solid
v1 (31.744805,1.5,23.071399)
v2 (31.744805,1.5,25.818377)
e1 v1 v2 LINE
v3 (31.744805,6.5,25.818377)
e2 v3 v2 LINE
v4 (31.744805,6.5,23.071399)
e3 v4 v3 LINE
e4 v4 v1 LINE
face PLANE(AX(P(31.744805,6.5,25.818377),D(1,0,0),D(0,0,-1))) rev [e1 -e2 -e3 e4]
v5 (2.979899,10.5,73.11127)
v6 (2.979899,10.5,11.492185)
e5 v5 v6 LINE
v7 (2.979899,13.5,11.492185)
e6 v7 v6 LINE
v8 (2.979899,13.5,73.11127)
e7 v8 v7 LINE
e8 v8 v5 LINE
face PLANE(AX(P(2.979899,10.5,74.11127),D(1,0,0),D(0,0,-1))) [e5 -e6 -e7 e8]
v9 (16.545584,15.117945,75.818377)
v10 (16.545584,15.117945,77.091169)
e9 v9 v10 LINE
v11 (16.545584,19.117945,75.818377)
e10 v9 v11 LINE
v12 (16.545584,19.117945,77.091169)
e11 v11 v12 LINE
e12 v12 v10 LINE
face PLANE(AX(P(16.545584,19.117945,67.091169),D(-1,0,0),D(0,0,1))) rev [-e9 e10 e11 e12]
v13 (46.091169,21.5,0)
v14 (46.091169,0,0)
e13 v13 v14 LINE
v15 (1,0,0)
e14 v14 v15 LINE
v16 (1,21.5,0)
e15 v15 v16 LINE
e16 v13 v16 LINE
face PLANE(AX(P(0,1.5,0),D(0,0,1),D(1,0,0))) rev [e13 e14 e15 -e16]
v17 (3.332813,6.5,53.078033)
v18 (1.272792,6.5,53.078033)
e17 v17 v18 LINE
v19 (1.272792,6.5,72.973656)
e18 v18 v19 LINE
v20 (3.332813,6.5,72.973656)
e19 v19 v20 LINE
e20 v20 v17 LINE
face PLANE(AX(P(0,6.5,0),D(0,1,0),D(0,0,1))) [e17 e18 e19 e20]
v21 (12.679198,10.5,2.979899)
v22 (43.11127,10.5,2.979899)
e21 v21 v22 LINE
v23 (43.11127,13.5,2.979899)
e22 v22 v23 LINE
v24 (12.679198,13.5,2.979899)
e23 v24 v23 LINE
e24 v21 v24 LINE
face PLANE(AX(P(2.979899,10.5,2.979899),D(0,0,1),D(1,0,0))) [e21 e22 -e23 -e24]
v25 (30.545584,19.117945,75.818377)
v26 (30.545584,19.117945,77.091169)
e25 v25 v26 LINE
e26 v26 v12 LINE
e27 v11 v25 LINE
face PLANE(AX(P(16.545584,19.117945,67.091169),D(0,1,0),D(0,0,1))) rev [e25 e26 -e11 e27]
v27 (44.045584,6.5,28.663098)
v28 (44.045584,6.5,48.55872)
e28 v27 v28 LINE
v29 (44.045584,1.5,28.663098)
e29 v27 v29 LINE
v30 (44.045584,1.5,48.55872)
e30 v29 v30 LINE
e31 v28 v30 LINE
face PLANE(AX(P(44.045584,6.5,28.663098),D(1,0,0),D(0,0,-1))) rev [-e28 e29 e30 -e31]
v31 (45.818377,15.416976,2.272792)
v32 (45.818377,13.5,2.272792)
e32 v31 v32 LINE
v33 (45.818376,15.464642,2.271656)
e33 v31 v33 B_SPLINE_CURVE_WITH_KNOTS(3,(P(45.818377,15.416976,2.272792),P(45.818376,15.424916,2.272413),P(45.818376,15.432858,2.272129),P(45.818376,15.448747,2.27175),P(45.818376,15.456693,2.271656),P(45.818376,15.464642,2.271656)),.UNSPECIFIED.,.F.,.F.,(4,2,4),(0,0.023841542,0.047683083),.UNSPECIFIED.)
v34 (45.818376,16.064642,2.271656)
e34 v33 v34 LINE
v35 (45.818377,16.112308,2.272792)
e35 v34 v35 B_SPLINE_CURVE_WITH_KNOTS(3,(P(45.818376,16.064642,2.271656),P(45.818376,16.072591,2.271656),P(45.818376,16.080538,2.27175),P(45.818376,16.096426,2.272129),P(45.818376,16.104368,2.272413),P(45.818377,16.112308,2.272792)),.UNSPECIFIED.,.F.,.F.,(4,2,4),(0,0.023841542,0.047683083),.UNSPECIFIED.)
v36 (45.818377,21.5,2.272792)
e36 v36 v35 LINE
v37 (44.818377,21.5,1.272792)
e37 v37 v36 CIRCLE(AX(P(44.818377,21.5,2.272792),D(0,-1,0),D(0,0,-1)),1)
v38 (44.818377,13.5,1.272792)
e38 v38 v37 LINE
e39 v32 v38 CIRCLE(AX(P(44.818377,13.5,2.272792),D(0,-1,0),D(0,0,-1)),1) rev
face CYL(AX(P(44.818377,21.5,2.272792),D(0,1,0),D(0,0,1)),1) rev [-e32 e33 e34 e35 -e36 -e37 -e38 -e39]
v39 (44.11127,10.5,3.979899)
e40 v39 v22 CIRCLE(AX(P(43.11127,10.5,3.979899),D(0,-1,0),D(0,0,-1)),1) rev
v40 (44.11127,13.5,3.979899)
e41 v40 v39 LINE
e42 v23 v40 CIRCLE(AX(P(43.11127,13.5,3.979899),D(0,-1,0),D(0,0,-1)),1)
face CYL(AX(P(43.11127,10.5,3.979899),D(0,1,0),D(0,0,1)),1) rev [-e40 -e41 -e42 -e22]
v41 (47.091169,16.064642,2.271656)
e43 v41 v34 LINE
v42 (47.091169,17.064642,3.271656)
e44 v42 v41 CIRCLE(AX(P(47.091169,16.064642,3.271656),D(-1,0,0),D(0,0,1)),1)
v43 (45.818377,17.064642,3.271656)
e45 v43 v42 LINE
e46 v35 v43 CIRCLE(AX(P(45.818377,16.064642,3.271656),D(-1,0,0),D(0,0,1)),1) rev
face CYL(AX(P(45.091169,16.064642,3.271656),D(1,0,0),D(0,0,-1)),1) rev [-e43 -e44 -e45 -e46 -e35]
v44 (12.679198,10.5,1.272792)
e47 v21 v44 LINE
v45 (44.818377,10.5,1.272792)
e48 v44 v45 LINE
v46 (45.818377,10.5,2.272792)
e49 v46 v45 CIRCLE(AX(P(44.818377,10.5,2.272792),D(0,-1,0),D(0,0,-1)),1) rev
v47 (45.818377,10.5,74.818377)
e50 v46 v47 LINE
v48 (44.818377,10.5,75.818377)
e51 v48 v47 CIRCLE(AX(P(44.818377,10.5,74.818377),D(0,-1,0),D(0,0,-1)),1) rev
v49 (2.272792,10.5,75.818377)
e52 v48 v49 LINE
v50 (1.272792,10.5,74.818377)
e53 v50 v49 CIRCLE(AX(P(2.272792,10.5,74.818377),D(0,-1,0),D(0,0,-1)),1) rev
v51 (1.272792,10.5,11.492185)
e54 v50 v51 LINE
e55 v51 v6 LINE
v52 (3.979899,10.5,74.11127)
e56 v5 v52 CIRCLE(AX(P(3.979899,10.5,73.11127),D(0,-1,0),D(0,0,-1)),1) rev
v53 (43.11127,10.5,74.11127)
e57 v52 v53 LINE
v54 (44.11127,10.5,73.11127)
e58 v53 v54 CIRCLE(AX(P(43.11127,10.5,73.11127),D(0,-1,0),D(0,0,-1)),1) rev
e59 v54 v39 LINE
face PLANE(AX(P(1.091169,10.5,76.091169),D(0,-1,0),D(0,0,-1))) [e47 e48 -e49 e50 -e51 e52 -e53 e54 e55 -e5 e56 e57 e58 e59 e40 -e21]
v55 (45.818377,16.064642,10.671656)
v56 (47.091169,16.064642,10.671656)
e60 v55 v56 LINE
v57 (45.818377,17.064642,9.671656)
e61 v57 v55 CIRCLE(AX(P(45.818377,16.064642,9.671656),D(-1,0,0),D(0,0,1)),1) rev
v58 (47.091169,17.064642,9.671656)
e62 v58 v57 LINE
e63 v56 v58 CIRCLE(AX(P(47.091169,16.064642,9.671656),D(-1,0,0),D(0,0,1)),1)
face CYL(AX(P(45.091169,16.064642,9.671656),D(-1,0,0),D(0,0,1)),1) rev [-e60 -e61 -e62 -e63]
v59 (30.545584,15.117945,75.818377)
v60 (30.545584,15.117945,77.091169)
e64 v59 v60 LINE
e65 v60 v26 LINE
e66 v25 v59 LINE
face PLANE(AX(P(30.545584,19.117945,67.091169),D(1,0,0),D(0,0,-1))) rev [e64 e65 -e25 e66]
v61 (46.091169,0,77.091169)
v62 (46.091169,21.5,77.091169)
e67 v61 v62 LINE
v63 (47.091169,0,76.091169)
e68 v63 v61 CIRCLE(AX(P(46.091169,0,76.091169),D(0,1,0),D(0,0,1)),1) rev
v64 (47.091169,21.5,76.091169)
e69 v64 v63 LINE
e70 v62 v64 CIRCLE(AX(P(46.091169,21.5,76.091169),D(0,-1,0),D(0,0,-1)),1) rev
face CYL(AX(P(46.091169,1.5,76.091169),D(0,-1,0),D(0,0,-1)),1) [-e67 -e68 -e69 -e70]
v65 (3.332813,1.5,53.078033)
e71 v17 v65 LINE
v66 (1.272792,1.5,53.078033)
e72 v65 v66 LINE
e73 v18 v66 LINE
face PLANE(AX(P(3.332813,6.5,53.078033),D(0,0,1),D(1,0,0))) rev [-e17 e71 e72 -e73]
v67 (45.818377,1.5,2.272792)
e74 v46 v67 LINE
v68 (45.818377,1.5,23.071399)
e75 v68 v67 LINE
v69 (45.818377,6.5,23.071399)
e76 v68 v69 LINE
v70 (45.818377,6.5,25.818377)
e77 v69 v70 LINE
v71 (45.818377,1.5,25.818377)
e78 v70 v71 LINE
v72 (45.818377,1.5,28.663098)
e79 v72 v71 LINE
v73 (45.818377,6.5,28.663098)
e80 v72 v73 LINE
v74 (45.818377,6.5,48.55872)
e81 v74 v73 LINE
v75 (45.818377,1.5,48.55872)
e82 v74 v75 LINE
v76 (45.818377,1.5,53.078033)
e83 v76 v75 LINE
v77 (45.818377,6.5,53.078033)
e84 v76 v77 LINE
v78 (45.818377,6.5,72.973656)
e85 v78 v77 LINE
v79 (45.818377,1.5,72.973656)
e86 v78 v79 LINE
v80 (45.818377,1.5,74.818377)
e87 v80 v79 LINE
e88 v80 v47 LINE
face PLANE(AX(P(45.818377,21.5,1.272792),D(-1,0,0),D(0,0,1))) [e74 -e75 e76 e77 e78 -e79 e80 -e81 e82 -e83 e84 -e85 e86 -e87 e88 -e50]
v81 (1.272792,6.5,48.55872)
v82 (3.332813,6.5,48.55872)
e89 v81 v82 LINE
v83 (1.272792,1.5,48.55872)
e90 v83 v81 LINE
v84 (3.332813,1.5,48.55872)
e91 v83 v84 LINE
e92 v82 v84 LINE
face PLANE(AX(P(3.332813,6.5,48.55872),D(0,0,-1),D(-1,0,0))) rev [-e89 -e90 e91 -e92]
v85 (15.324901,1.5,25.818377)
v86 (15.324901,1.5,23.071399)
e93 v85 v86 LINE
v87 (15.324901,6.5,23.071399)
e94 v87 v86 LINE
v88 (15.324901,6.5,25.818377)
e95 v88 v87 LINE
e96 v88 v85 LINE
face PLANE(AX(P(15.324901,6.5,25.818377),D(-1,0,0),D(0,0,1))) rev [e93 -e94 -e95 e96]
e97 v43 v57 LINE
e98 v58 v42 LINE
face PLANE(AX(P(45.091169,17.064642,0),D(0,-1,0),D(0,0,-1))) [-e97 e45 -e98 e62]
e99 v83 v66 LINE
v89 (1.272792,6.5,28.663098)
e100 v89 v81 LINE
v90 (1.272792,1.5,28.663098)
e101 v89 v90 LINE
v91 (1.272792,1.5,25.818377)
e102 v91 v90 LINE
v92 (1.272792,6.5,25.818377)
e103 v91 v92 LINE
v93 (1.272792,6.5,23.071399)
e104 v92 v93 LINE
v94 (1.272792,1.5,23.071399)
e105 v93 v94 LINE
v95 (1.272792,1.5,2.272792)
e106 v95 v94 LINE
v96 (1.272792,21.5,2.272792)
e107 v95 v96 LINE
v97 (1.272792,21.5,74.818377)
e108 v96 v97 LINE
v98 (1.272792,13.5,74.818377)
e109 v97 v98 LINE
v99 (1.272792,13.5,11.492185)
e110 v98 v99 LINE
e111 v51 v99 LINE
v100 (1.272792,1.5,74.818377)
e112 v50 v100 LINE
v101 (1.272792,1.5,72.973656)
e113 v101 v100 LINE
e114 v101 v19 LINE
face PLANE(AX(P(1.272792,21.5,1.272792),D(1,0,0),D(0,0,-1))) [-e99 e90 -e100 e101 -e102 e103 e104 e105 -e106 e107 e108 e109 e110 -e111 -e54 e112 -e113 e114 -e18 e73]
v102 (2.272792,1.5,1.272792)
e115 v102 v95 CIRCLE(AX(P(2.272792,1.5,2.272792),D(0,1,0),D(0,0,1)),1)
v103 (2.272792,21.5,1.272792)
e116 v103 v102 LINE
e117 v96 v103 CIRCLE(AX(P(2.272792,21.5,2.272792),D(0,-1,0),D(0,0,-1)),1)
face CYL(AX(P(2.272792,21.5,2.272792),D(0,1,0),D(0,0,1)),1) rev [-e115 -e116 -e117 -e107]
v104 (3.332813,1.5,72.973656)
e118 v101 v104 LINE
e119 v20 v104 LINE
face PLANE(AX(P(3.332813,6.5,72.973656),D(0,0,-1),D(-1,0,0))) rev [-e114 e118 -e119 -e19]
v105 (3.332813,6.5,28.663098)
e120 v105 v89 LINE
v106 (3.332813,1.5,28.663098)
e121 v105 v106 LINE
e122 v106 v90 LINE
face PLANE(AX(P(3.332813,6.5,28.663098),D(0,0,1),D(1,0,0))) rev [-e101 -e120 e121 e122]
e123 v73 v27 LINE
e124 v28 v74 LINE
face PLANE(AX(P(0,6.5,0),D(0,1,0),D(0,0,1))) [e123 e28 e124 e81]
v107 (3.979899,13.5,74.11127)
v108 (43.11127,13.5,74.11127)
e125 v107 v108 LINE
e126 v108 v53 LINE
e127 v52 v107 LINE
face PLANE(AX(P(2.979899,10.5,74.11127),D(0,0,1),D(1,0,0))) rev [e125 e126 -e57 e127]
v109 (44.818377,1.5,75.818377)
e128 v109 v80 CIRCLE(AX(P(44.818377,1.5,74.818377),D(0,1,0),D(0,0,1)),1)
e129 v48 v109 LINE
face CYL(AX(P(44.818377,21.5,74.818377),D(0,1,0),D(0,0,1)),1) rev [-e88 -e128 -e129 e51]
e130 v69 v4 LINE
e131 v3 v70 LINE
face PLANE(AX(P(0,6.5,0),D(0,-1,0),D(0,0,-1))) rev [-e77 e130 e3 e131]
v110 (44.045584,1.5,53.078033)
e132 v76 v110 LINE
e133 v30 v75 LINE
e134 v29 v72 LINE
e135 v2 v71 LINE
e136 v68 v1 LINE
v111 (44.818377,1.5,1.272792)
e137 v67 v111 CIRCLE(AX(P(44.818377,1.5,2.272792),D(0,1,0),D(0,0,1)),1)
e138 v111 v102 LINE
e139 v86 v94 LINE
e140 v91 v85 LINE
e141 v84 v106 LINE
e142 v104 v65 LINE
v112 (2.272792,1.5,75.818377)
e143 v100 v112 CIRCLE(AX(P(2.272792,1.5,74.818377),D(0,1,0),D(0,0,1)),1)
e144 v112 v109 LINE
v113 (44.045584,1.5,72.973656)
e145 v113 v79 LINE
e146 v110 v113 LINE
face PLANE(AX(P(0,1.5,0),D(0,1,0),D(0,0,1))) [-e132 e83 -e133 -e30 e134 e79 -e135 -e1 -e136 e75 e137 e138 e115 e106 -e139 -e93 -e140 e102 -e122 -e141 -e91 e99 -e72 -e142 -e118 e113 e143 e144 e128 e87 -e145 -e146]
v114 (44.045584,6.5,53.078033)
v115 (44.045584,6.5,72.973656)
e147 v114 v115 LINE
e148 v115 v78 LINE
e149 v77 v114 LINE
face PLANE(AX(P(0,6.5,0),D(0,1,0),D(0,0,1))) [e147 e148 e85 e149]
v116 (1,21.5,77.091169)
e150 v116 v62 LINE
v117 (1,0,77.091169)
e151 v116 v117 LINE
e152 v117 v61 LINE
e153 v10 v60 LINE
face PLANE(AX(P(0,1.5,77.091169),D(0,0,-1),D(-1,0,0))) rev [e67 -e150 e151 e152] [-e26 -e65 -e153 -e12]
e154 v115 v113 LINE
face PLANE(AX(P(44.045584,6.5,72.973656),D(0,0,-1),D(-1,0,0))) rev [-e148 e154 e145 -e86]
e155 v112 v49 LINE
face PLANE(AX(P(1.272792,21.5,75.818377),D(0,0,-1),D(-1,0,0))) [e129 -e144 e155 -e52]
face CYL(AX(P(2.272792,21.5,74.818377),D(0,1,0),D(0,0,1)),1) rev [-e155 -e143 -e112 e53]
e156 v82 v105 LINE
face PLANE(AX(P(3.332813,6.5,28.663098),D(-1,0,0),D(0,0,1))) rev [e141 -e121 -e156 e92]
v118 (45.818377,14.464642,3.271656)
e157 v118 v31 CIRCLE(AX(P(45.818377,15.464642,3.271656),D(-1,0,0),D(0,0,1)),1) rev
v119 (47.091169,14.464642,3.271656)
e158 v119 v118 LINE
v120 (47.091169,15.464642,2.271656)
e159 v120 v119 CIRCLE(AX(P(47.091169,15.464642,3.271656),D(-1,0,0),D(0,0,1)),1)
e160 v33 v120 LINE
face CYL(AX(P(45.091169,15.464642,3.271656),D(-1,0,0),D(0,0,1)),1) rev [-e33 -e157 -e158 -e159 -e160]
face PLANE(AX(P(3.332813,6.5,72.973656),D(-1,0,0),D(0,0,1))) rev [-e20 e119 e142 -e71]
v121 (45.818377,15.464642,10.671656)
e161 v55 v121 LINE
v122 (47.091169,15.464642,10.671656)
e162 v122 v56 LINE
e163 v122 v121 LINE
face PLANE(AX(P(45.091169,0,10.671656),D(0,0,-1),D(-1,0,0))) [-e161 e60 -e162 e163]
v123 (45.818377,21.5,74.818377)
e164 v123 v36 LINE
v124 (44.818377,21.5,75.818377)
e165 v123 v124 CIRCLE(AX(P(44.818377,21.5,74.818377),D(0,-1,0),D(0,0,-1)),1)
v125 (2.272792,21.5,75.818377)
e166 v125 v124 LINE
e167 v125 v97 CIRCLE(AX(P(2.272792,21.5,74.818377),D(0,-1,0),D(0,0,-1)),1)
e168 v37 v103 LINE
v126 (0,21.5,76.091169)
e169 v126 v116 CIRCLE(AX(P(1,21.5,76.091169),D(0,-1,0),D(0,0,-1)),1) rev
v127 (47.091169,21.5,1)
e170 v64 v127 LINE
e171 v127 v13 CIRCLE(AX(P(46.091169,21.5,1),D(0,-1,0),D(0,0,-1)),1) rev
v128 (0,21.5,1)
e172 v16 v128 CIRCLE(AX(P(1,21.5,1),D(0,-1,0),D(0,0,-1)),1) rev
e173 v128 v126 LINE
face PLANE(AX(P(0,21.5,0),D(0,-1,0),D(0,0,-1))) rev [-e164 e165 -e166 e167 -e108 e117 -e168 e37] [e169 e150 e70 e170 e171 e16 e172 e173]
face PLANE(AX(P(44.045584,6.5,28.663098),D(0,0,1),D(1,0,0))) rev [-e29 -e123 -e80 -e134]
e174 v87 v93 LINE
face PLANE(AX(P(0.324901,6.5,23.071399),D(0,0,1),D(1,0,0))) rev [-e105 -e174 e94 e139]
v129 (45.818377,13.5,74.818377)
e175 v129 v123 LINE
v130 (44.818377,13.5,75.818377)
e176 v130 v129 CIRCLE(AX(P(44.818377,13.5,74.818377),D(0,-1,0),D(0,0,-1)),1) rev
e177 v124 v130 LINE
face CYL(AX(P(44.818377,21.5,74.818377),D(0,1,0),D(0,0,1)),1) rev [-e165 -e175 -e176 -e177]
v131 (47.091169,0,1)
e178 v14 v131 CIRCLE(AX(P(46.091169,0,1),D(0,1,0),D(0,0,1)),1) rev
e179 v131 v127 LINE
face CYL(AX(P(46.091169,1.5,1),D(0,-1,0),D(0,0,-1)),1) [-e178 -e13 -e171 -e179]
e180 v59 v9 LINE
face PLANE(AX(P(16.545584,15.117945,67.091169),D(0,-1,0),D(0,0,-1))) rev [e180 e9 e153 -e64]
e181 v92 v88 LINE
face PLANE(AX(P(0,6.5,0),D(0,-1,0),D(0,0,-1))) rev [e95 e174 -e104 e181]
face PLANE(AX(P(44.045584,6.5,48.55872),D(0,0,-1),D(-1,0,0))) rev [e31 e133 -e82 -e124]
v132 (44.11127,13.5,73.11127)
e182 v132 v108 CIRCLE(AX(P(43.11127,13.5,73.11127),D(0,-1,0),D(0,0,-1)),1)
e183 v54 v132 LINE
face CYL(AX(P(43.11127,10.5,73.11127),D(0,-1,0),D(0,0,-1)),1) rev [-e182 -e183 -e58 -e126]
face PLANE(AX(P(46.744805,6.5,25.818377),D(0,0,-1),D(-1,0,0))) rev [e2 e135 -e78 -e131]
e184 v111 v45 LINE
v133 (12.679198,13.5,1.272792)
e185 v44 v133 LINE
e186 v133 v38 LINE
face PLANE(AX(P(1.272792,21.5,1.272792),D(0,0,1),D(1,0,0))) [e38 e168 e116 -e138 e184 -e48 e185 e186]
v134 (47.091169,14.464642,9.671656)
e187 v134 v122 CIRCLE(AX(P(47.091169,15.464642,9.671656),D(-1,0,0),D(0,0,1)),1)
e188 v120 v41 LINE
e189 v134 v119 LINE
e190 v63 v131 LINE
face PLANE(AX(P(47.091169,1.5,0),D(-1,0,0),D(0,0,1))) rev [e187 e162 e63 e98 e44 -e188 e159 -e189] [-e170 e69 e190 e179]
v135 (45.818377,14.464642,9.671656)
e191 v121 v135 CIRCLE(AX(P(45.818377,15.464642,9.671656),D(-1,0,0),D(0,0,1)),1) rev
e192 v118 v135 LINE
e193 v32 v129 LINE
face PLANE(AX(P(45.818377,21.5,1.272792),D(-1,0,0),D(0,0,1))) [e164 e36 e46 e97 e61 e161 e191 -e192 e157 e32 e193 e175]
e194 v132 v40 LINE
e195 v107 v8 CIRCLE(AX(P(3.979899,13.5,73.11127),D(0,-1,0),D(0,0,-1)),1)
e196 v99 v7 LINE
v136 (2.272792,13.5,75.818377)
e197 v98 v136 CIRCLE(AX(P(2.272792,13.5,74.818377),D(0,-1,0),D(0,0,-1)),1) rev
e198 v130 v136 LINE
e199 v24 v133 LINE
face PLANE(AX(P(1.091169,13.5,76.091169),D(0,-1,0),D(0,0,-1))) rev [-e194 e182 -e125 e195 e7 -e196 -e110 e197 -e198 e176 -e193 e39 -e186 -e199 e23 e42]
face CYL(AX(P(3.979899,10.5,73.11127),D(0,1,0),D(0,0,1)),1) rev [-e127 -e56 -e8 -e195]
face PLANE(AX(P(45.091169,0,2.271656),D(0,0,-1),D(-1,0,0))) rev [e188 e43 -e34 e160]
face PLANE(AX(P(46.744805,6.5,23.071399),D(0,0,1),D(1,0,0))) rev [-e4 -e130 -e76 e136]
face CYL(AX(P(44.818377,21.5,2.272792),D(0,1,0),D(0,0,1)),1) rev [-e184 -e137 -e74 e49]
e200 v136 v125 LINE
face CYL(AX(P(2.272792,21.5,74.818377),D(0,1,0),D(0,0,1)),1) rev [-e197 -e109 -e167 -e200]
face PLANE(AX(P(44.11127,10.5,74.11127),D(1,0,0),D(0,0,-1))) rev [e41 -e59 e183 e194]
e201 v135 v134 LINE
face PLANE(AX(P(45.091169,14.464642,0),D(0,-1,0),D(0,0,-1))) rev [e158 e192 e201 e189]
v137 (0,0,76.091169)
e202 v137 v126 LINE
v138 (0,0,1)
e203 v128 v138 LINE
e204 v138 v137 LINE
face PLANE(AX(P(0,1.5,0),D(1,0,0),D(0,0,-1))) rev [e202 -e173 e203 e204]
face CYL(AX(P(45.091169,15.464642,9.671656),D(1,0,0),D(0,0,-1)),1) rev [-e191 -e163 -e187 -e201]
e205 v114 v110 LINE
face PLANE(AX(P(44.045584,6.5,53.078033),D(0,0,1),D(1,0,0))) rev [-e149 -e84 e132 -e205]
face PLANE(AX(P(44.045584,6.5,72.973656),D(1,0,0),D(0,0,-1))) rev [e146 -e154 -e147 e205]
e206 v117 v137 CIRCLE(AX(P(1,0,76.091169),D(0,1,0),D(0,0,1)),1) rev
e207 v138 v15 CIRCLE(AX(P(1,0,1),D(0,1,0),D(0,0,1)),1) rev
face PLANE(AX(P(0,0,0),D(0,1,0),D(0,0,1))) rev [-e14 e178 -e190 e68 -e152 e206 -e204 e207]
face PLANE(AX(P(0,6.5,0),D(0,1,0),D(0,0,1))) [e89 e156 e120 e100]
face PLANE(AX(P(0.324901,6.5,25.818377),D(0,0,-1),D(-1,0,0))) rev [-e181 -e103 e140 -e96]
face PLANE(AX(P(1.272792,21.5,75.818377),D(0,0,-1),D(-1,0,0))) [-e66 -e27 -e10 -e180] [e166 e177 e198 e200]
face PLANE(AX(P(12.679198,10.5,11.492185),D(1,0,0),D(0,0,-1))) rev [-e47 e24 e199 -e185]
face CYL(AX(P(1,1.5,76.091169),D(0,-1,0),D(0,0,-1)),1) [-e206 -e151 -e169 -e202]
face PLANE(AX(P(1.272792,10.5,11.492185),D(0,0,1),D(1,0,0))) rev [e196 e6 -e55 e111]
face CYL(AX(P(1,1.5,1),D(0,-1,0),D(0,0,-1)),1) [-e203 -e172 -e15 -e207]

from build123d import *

# Parameters (mm, degrees)
SKETCH1_W           = 47.09116882
SKETCH1_H           = 77.09116882
BOSS_EXTRUDE1_DEPTH = 1.5
SKETCH2_W           = 47.09116882
SKETCH2_H           = 77.09116882
SKETCH2_W_2         = 44.545584412
SKETCH2_H_2         = 74.545584412
BOSS_EXTRUDE2_DEPTH = 20
FILLET4_R           = 1
SKETCH9_W           = 8.4
SKETCH9_H           = 2.6
CUT_EXTRUDE4_DEPTH  = 2
FILLET5_R           = 1
SKETCH10_W          = 2.5
SKETCH10_H          = 19.895622202
SKETCH10_W_2        = 15
SKETCH10_H_2        = 2.746977623
BOSS_EXTRUDE4_DEPTH = 5
SKETCH11_W          = 14
SKETCH11_H          = 4
CUT_EXTRUDE5_DEPTH  = 10
SKETCH12_W          = 75.09116882
SKETCH12_H          = 3
BOSS_EXTRUDE5_DEPTH = 46
SKETCH13_W          = 41.13137085
SKETCH13_H          = 71.13137085
CUT_EXTRUDE6_DEPTH  = 3
FILLET6_R           = 1
CUT_EXTRUDE8_DEPTH  = 3


with BuildPart() as part:
    # Sketch1 → Boss-Extrude1 (new body)
    with BuildSketch(Plane(origin=(0, 0, 0), x_dir=(1, 0, 0), z_dir=(0, 1, 0))):
        with Locations((23.54558441, -38.54558441)):
            Rectangle(SKETCH1_W, SKETCH1_H)
    extrude(amount=BOSS_EXTRUDE1_DEPTH)

    # Sketch2 → Boss-Extrude2 (add)
    with BuildSketch(Plane(origin=(0, 1.5, 0), x_dir=(1, 0, 0), z_dir=(0, 1, 0))):
        with Locations((23.54558441, -38.54558441)):
            Rectangle(SKETCH2_W, SKETCH2_H)
        with Locations((23.545584412, -38.545584412)):
            Rectangle(SKETCH2_W_2, SKETCH2_H_2, mode=Mode.SUBTRACT)
    extrude(amount=BOSS_EXTRUDE2_DEPTH)

    # Fillet4
    fillet4_edges = [part.edges().sort_by_distance(p)[0] for p in [
        (1.272792206, 11.5, 75.818376618),
        (45.818376618, 11.5, 75.818376618),
        (45.818376618, 11.5, 1.272792206),
        (1.272792206, 11.5, 1.272792206),
        (0, 10.75, 0),
        (47.09116882, 10.75, 0),
        (47.09116882, 10.75, 77.09116882),
        (0, 10.75, 77.09116882),
    ]]
    fillet(fillet4_edges, radius=FILLET4_R)

    # Sketch9 → Cut-Extrude4 (cut)
    with BuildSketch(Plane(origin=(47.09116882, 0, 0), x_dir=(0, 0, -1), z_dir=(1, 0, 0))):
        with Locations((-6.471655529, 15.764642051)):
            Rectangle(SKETCH9_W, SKETCH9_H)
    extrude(amount=-CUT_EXTRUDE4_DEPTH, mode=Mode.SUBTRACT)

    # Fillet5
    # the kernel refuses this fillet: 1 mm, written as the material it adds along each edge
    with BuildSketch(Plane(origin=(47.09116882, 17.064642051, 10.671655529), x_dir=(0, 0, -1), z_dir=(-1, 0, 0))) as fillet5_piece_1:
        with BuildLine():
            CenterArc((FILLET5_R, FILLET5_R), FILLET5_R, 180, 90)
            Line((0, FILLET5_R), (0, 0))
            Line((0, 0), (FILLET5_R, 0))
        make_face()
    extrude(amount=1.272792202)
    with BuildSketch(Plane(origin=(47.09116882, 14.464642051, 2.271655529), x_dir=(0, 0, 1), z_dir=(-1, 0, 0))) as fillet5_piece_2_section:
        with BuildLine():
            CenterArc((FILLET5_R, FILLET5_R), FILLET5_R, 180, 90)
            Line((0, FILLET5_R), (0, 0))
            Line((0, 0), (FILLET5_R, 0))
        make_face()
    fillet5_piece_2 = extrude(amount=3.772792848, mode=Mode.PRIVATE)
    fillet5_piece_2 = split(fillet5_piece_2, bisect_by=Plane(origin=(45.818376618, 14.688009946, 2.495023498), z_dir=(1, 0, 0)), keep=Keep.TOP, mode=Mode.PRIVATE)
    add(fillet5_piece_2)
    with BuildSketch(Plane(origin=(47.09116882, 17.064642051, 2.271655529), x_dir=(0, -1, 0), z_dir=(-1, 0, 0))) as fillet5_piece_3_section:
        with BuildLine():
            CenterArc((FILLET5_R, FILLET5_R), FILLET5_R, 180, 90)
            Line((0, FILLET5_R), (0, 0))
            Line((0, 0), (FILLET5_R, 0))
        make_face()
    fillet5_piece_3 = extrude(amount=3.772792848, mode=Mode.PRIVATE)
    fillet5_piece_3 = split(fillet5_piece_3, bisect_by=Plane(origin=(45.818376618, 16.841274155, 2.495023498), z_dir=(1, 0, 0)), keep=Keep.TOP, mode=Mode.PRIVATE)
    add(fillet5_piece_3)
    with BuildSketch(Plane(origin=(47.09116882, 14.464642051, 10.671655529), x_dir=(0, 0, -1), z_dir=(-1, 0, 0))) as fillet5_piece_4:
        with BuildLine():
            CenterArc((FILLET5_R, -FILLET5_R), FILLET5_R, 90, 90)
            Line((0, -FILLET5_R), (0, 0))
            Line((0, 0), (FILLET5_R, 0))
        make_face()
    extrude(amount=1.272792202)

    # Sketch10 → Boss-Extrude4 (add)
    with BuildSketch(Plane(origin=(0, 1.5, 0), x_dir=(1, 0, 0), z_dir=(0, 1, 0))):
        with Locations((2.082813384, -63.025844565)):
            Rectangle(SKETCH10_W, SKETCH10_H)
        with Locations((7.824900782, -24.444887807)):
            Rectangle(SKETCH10_W_2, SKETCH10_H_2)
        with Locations((39.244805213, -24.444887807)):
            Rectangle(SKETCH10_W_2, SKETCH10_H_2)
        with Locations((2.082813384, -38.610908672)):
            Rectangle(SKETCH10_W, SKETCH10_H)
        with Locations((45.295584412, -38.610908672)):
            Rectangle(SKETCH10_W, SKETCH10_H)
        with Locations((45.295584412, -63.025844565)):
            Rectangle(SKETCH10_W, SKETCH10_H)
    extrude(amount=BOSS_EXTRUDE4_DEPTH)

    # Sketch11 → Cut-Extrude5 (cut)
    with BuildSketch(Plane.XY.offset(77.09116882)):
        with Locations((23.545584412, 17.117945241)):
            Rectangle(SKETCH11_W, SKETCH11_H)
    extrude(amount=-CUT_EXTRUDE5_DEPTH, mode=Mode.SUBTRACT)

    # Sketch12 → Boss-Extrude5 (add)
    with BuildSketch(Plane(origin=(47.09116882, 0, 0), x_dir=(0, 0, -1), z_dir=(1, 0, 0))):
        with Locations((-38.54558441, 12)):
            Rectangle(SKETCH12_W, SKETCH12_H)
    extrude(amount=-BOSS_EXTRUDE5_DEPTH)

    # Sketch13 → Cut-Extrude6 (cut)
    with BuildSketch(Plane(origin=(0, 13.5, 0), x_dir=(1, 0, 0), z_dir=(0, 1, 0))):
        with Locations((23.545584412, -38.545584412)):
            Rectangle(SKETCH13_W, SKETCH13_H)
    extrude(amount=-CUT_EXTRUDE6_DEPTH, mode=Mode.SUBTRACT)

    # Fillet6
    fillet6_edges = [part.edges().sort_by_distance(p)[0] for p in [
        (44.111269837, 12, 74.111269837),
        (2.979898987, 12, 74.111269837),
        (2.979898987, 12, 2.979898987),
        (44.111269837, 12, 2.979898987),
    ]]
    fillet(fillet6_edges, radius=FILLET6_R)

    # Sketch14 → Cut-Extrude8 (cut)
    with BuildSketch(Plane(origin=(0, 13.5, 0), x_dir=(1, 0, 0), z_dir=(0, 1, 0))):
        with BuildLine():
            Line((1.272792206, -11.492184631), (12.679197534, -11.492184631))
            Line((12.679197534, -11.492184631), (12.679197534, -1.272792206))
            Line((12.679197534, -1.272792206), (2.272792206, -1.272792206))
            ThreePointArc((2.272792206, -1.272792206), (1.565685425, -1.565685425), (1.272792206, -2.272792206))
            Line((1.272792206, -2.272792206), (1.272792206, -11.492184631))
        make_face()
    extrude(amount=-CUT_EXTRUDE8_DEPTH, mode=Mode.SUBTRACT)


solid = part.part
